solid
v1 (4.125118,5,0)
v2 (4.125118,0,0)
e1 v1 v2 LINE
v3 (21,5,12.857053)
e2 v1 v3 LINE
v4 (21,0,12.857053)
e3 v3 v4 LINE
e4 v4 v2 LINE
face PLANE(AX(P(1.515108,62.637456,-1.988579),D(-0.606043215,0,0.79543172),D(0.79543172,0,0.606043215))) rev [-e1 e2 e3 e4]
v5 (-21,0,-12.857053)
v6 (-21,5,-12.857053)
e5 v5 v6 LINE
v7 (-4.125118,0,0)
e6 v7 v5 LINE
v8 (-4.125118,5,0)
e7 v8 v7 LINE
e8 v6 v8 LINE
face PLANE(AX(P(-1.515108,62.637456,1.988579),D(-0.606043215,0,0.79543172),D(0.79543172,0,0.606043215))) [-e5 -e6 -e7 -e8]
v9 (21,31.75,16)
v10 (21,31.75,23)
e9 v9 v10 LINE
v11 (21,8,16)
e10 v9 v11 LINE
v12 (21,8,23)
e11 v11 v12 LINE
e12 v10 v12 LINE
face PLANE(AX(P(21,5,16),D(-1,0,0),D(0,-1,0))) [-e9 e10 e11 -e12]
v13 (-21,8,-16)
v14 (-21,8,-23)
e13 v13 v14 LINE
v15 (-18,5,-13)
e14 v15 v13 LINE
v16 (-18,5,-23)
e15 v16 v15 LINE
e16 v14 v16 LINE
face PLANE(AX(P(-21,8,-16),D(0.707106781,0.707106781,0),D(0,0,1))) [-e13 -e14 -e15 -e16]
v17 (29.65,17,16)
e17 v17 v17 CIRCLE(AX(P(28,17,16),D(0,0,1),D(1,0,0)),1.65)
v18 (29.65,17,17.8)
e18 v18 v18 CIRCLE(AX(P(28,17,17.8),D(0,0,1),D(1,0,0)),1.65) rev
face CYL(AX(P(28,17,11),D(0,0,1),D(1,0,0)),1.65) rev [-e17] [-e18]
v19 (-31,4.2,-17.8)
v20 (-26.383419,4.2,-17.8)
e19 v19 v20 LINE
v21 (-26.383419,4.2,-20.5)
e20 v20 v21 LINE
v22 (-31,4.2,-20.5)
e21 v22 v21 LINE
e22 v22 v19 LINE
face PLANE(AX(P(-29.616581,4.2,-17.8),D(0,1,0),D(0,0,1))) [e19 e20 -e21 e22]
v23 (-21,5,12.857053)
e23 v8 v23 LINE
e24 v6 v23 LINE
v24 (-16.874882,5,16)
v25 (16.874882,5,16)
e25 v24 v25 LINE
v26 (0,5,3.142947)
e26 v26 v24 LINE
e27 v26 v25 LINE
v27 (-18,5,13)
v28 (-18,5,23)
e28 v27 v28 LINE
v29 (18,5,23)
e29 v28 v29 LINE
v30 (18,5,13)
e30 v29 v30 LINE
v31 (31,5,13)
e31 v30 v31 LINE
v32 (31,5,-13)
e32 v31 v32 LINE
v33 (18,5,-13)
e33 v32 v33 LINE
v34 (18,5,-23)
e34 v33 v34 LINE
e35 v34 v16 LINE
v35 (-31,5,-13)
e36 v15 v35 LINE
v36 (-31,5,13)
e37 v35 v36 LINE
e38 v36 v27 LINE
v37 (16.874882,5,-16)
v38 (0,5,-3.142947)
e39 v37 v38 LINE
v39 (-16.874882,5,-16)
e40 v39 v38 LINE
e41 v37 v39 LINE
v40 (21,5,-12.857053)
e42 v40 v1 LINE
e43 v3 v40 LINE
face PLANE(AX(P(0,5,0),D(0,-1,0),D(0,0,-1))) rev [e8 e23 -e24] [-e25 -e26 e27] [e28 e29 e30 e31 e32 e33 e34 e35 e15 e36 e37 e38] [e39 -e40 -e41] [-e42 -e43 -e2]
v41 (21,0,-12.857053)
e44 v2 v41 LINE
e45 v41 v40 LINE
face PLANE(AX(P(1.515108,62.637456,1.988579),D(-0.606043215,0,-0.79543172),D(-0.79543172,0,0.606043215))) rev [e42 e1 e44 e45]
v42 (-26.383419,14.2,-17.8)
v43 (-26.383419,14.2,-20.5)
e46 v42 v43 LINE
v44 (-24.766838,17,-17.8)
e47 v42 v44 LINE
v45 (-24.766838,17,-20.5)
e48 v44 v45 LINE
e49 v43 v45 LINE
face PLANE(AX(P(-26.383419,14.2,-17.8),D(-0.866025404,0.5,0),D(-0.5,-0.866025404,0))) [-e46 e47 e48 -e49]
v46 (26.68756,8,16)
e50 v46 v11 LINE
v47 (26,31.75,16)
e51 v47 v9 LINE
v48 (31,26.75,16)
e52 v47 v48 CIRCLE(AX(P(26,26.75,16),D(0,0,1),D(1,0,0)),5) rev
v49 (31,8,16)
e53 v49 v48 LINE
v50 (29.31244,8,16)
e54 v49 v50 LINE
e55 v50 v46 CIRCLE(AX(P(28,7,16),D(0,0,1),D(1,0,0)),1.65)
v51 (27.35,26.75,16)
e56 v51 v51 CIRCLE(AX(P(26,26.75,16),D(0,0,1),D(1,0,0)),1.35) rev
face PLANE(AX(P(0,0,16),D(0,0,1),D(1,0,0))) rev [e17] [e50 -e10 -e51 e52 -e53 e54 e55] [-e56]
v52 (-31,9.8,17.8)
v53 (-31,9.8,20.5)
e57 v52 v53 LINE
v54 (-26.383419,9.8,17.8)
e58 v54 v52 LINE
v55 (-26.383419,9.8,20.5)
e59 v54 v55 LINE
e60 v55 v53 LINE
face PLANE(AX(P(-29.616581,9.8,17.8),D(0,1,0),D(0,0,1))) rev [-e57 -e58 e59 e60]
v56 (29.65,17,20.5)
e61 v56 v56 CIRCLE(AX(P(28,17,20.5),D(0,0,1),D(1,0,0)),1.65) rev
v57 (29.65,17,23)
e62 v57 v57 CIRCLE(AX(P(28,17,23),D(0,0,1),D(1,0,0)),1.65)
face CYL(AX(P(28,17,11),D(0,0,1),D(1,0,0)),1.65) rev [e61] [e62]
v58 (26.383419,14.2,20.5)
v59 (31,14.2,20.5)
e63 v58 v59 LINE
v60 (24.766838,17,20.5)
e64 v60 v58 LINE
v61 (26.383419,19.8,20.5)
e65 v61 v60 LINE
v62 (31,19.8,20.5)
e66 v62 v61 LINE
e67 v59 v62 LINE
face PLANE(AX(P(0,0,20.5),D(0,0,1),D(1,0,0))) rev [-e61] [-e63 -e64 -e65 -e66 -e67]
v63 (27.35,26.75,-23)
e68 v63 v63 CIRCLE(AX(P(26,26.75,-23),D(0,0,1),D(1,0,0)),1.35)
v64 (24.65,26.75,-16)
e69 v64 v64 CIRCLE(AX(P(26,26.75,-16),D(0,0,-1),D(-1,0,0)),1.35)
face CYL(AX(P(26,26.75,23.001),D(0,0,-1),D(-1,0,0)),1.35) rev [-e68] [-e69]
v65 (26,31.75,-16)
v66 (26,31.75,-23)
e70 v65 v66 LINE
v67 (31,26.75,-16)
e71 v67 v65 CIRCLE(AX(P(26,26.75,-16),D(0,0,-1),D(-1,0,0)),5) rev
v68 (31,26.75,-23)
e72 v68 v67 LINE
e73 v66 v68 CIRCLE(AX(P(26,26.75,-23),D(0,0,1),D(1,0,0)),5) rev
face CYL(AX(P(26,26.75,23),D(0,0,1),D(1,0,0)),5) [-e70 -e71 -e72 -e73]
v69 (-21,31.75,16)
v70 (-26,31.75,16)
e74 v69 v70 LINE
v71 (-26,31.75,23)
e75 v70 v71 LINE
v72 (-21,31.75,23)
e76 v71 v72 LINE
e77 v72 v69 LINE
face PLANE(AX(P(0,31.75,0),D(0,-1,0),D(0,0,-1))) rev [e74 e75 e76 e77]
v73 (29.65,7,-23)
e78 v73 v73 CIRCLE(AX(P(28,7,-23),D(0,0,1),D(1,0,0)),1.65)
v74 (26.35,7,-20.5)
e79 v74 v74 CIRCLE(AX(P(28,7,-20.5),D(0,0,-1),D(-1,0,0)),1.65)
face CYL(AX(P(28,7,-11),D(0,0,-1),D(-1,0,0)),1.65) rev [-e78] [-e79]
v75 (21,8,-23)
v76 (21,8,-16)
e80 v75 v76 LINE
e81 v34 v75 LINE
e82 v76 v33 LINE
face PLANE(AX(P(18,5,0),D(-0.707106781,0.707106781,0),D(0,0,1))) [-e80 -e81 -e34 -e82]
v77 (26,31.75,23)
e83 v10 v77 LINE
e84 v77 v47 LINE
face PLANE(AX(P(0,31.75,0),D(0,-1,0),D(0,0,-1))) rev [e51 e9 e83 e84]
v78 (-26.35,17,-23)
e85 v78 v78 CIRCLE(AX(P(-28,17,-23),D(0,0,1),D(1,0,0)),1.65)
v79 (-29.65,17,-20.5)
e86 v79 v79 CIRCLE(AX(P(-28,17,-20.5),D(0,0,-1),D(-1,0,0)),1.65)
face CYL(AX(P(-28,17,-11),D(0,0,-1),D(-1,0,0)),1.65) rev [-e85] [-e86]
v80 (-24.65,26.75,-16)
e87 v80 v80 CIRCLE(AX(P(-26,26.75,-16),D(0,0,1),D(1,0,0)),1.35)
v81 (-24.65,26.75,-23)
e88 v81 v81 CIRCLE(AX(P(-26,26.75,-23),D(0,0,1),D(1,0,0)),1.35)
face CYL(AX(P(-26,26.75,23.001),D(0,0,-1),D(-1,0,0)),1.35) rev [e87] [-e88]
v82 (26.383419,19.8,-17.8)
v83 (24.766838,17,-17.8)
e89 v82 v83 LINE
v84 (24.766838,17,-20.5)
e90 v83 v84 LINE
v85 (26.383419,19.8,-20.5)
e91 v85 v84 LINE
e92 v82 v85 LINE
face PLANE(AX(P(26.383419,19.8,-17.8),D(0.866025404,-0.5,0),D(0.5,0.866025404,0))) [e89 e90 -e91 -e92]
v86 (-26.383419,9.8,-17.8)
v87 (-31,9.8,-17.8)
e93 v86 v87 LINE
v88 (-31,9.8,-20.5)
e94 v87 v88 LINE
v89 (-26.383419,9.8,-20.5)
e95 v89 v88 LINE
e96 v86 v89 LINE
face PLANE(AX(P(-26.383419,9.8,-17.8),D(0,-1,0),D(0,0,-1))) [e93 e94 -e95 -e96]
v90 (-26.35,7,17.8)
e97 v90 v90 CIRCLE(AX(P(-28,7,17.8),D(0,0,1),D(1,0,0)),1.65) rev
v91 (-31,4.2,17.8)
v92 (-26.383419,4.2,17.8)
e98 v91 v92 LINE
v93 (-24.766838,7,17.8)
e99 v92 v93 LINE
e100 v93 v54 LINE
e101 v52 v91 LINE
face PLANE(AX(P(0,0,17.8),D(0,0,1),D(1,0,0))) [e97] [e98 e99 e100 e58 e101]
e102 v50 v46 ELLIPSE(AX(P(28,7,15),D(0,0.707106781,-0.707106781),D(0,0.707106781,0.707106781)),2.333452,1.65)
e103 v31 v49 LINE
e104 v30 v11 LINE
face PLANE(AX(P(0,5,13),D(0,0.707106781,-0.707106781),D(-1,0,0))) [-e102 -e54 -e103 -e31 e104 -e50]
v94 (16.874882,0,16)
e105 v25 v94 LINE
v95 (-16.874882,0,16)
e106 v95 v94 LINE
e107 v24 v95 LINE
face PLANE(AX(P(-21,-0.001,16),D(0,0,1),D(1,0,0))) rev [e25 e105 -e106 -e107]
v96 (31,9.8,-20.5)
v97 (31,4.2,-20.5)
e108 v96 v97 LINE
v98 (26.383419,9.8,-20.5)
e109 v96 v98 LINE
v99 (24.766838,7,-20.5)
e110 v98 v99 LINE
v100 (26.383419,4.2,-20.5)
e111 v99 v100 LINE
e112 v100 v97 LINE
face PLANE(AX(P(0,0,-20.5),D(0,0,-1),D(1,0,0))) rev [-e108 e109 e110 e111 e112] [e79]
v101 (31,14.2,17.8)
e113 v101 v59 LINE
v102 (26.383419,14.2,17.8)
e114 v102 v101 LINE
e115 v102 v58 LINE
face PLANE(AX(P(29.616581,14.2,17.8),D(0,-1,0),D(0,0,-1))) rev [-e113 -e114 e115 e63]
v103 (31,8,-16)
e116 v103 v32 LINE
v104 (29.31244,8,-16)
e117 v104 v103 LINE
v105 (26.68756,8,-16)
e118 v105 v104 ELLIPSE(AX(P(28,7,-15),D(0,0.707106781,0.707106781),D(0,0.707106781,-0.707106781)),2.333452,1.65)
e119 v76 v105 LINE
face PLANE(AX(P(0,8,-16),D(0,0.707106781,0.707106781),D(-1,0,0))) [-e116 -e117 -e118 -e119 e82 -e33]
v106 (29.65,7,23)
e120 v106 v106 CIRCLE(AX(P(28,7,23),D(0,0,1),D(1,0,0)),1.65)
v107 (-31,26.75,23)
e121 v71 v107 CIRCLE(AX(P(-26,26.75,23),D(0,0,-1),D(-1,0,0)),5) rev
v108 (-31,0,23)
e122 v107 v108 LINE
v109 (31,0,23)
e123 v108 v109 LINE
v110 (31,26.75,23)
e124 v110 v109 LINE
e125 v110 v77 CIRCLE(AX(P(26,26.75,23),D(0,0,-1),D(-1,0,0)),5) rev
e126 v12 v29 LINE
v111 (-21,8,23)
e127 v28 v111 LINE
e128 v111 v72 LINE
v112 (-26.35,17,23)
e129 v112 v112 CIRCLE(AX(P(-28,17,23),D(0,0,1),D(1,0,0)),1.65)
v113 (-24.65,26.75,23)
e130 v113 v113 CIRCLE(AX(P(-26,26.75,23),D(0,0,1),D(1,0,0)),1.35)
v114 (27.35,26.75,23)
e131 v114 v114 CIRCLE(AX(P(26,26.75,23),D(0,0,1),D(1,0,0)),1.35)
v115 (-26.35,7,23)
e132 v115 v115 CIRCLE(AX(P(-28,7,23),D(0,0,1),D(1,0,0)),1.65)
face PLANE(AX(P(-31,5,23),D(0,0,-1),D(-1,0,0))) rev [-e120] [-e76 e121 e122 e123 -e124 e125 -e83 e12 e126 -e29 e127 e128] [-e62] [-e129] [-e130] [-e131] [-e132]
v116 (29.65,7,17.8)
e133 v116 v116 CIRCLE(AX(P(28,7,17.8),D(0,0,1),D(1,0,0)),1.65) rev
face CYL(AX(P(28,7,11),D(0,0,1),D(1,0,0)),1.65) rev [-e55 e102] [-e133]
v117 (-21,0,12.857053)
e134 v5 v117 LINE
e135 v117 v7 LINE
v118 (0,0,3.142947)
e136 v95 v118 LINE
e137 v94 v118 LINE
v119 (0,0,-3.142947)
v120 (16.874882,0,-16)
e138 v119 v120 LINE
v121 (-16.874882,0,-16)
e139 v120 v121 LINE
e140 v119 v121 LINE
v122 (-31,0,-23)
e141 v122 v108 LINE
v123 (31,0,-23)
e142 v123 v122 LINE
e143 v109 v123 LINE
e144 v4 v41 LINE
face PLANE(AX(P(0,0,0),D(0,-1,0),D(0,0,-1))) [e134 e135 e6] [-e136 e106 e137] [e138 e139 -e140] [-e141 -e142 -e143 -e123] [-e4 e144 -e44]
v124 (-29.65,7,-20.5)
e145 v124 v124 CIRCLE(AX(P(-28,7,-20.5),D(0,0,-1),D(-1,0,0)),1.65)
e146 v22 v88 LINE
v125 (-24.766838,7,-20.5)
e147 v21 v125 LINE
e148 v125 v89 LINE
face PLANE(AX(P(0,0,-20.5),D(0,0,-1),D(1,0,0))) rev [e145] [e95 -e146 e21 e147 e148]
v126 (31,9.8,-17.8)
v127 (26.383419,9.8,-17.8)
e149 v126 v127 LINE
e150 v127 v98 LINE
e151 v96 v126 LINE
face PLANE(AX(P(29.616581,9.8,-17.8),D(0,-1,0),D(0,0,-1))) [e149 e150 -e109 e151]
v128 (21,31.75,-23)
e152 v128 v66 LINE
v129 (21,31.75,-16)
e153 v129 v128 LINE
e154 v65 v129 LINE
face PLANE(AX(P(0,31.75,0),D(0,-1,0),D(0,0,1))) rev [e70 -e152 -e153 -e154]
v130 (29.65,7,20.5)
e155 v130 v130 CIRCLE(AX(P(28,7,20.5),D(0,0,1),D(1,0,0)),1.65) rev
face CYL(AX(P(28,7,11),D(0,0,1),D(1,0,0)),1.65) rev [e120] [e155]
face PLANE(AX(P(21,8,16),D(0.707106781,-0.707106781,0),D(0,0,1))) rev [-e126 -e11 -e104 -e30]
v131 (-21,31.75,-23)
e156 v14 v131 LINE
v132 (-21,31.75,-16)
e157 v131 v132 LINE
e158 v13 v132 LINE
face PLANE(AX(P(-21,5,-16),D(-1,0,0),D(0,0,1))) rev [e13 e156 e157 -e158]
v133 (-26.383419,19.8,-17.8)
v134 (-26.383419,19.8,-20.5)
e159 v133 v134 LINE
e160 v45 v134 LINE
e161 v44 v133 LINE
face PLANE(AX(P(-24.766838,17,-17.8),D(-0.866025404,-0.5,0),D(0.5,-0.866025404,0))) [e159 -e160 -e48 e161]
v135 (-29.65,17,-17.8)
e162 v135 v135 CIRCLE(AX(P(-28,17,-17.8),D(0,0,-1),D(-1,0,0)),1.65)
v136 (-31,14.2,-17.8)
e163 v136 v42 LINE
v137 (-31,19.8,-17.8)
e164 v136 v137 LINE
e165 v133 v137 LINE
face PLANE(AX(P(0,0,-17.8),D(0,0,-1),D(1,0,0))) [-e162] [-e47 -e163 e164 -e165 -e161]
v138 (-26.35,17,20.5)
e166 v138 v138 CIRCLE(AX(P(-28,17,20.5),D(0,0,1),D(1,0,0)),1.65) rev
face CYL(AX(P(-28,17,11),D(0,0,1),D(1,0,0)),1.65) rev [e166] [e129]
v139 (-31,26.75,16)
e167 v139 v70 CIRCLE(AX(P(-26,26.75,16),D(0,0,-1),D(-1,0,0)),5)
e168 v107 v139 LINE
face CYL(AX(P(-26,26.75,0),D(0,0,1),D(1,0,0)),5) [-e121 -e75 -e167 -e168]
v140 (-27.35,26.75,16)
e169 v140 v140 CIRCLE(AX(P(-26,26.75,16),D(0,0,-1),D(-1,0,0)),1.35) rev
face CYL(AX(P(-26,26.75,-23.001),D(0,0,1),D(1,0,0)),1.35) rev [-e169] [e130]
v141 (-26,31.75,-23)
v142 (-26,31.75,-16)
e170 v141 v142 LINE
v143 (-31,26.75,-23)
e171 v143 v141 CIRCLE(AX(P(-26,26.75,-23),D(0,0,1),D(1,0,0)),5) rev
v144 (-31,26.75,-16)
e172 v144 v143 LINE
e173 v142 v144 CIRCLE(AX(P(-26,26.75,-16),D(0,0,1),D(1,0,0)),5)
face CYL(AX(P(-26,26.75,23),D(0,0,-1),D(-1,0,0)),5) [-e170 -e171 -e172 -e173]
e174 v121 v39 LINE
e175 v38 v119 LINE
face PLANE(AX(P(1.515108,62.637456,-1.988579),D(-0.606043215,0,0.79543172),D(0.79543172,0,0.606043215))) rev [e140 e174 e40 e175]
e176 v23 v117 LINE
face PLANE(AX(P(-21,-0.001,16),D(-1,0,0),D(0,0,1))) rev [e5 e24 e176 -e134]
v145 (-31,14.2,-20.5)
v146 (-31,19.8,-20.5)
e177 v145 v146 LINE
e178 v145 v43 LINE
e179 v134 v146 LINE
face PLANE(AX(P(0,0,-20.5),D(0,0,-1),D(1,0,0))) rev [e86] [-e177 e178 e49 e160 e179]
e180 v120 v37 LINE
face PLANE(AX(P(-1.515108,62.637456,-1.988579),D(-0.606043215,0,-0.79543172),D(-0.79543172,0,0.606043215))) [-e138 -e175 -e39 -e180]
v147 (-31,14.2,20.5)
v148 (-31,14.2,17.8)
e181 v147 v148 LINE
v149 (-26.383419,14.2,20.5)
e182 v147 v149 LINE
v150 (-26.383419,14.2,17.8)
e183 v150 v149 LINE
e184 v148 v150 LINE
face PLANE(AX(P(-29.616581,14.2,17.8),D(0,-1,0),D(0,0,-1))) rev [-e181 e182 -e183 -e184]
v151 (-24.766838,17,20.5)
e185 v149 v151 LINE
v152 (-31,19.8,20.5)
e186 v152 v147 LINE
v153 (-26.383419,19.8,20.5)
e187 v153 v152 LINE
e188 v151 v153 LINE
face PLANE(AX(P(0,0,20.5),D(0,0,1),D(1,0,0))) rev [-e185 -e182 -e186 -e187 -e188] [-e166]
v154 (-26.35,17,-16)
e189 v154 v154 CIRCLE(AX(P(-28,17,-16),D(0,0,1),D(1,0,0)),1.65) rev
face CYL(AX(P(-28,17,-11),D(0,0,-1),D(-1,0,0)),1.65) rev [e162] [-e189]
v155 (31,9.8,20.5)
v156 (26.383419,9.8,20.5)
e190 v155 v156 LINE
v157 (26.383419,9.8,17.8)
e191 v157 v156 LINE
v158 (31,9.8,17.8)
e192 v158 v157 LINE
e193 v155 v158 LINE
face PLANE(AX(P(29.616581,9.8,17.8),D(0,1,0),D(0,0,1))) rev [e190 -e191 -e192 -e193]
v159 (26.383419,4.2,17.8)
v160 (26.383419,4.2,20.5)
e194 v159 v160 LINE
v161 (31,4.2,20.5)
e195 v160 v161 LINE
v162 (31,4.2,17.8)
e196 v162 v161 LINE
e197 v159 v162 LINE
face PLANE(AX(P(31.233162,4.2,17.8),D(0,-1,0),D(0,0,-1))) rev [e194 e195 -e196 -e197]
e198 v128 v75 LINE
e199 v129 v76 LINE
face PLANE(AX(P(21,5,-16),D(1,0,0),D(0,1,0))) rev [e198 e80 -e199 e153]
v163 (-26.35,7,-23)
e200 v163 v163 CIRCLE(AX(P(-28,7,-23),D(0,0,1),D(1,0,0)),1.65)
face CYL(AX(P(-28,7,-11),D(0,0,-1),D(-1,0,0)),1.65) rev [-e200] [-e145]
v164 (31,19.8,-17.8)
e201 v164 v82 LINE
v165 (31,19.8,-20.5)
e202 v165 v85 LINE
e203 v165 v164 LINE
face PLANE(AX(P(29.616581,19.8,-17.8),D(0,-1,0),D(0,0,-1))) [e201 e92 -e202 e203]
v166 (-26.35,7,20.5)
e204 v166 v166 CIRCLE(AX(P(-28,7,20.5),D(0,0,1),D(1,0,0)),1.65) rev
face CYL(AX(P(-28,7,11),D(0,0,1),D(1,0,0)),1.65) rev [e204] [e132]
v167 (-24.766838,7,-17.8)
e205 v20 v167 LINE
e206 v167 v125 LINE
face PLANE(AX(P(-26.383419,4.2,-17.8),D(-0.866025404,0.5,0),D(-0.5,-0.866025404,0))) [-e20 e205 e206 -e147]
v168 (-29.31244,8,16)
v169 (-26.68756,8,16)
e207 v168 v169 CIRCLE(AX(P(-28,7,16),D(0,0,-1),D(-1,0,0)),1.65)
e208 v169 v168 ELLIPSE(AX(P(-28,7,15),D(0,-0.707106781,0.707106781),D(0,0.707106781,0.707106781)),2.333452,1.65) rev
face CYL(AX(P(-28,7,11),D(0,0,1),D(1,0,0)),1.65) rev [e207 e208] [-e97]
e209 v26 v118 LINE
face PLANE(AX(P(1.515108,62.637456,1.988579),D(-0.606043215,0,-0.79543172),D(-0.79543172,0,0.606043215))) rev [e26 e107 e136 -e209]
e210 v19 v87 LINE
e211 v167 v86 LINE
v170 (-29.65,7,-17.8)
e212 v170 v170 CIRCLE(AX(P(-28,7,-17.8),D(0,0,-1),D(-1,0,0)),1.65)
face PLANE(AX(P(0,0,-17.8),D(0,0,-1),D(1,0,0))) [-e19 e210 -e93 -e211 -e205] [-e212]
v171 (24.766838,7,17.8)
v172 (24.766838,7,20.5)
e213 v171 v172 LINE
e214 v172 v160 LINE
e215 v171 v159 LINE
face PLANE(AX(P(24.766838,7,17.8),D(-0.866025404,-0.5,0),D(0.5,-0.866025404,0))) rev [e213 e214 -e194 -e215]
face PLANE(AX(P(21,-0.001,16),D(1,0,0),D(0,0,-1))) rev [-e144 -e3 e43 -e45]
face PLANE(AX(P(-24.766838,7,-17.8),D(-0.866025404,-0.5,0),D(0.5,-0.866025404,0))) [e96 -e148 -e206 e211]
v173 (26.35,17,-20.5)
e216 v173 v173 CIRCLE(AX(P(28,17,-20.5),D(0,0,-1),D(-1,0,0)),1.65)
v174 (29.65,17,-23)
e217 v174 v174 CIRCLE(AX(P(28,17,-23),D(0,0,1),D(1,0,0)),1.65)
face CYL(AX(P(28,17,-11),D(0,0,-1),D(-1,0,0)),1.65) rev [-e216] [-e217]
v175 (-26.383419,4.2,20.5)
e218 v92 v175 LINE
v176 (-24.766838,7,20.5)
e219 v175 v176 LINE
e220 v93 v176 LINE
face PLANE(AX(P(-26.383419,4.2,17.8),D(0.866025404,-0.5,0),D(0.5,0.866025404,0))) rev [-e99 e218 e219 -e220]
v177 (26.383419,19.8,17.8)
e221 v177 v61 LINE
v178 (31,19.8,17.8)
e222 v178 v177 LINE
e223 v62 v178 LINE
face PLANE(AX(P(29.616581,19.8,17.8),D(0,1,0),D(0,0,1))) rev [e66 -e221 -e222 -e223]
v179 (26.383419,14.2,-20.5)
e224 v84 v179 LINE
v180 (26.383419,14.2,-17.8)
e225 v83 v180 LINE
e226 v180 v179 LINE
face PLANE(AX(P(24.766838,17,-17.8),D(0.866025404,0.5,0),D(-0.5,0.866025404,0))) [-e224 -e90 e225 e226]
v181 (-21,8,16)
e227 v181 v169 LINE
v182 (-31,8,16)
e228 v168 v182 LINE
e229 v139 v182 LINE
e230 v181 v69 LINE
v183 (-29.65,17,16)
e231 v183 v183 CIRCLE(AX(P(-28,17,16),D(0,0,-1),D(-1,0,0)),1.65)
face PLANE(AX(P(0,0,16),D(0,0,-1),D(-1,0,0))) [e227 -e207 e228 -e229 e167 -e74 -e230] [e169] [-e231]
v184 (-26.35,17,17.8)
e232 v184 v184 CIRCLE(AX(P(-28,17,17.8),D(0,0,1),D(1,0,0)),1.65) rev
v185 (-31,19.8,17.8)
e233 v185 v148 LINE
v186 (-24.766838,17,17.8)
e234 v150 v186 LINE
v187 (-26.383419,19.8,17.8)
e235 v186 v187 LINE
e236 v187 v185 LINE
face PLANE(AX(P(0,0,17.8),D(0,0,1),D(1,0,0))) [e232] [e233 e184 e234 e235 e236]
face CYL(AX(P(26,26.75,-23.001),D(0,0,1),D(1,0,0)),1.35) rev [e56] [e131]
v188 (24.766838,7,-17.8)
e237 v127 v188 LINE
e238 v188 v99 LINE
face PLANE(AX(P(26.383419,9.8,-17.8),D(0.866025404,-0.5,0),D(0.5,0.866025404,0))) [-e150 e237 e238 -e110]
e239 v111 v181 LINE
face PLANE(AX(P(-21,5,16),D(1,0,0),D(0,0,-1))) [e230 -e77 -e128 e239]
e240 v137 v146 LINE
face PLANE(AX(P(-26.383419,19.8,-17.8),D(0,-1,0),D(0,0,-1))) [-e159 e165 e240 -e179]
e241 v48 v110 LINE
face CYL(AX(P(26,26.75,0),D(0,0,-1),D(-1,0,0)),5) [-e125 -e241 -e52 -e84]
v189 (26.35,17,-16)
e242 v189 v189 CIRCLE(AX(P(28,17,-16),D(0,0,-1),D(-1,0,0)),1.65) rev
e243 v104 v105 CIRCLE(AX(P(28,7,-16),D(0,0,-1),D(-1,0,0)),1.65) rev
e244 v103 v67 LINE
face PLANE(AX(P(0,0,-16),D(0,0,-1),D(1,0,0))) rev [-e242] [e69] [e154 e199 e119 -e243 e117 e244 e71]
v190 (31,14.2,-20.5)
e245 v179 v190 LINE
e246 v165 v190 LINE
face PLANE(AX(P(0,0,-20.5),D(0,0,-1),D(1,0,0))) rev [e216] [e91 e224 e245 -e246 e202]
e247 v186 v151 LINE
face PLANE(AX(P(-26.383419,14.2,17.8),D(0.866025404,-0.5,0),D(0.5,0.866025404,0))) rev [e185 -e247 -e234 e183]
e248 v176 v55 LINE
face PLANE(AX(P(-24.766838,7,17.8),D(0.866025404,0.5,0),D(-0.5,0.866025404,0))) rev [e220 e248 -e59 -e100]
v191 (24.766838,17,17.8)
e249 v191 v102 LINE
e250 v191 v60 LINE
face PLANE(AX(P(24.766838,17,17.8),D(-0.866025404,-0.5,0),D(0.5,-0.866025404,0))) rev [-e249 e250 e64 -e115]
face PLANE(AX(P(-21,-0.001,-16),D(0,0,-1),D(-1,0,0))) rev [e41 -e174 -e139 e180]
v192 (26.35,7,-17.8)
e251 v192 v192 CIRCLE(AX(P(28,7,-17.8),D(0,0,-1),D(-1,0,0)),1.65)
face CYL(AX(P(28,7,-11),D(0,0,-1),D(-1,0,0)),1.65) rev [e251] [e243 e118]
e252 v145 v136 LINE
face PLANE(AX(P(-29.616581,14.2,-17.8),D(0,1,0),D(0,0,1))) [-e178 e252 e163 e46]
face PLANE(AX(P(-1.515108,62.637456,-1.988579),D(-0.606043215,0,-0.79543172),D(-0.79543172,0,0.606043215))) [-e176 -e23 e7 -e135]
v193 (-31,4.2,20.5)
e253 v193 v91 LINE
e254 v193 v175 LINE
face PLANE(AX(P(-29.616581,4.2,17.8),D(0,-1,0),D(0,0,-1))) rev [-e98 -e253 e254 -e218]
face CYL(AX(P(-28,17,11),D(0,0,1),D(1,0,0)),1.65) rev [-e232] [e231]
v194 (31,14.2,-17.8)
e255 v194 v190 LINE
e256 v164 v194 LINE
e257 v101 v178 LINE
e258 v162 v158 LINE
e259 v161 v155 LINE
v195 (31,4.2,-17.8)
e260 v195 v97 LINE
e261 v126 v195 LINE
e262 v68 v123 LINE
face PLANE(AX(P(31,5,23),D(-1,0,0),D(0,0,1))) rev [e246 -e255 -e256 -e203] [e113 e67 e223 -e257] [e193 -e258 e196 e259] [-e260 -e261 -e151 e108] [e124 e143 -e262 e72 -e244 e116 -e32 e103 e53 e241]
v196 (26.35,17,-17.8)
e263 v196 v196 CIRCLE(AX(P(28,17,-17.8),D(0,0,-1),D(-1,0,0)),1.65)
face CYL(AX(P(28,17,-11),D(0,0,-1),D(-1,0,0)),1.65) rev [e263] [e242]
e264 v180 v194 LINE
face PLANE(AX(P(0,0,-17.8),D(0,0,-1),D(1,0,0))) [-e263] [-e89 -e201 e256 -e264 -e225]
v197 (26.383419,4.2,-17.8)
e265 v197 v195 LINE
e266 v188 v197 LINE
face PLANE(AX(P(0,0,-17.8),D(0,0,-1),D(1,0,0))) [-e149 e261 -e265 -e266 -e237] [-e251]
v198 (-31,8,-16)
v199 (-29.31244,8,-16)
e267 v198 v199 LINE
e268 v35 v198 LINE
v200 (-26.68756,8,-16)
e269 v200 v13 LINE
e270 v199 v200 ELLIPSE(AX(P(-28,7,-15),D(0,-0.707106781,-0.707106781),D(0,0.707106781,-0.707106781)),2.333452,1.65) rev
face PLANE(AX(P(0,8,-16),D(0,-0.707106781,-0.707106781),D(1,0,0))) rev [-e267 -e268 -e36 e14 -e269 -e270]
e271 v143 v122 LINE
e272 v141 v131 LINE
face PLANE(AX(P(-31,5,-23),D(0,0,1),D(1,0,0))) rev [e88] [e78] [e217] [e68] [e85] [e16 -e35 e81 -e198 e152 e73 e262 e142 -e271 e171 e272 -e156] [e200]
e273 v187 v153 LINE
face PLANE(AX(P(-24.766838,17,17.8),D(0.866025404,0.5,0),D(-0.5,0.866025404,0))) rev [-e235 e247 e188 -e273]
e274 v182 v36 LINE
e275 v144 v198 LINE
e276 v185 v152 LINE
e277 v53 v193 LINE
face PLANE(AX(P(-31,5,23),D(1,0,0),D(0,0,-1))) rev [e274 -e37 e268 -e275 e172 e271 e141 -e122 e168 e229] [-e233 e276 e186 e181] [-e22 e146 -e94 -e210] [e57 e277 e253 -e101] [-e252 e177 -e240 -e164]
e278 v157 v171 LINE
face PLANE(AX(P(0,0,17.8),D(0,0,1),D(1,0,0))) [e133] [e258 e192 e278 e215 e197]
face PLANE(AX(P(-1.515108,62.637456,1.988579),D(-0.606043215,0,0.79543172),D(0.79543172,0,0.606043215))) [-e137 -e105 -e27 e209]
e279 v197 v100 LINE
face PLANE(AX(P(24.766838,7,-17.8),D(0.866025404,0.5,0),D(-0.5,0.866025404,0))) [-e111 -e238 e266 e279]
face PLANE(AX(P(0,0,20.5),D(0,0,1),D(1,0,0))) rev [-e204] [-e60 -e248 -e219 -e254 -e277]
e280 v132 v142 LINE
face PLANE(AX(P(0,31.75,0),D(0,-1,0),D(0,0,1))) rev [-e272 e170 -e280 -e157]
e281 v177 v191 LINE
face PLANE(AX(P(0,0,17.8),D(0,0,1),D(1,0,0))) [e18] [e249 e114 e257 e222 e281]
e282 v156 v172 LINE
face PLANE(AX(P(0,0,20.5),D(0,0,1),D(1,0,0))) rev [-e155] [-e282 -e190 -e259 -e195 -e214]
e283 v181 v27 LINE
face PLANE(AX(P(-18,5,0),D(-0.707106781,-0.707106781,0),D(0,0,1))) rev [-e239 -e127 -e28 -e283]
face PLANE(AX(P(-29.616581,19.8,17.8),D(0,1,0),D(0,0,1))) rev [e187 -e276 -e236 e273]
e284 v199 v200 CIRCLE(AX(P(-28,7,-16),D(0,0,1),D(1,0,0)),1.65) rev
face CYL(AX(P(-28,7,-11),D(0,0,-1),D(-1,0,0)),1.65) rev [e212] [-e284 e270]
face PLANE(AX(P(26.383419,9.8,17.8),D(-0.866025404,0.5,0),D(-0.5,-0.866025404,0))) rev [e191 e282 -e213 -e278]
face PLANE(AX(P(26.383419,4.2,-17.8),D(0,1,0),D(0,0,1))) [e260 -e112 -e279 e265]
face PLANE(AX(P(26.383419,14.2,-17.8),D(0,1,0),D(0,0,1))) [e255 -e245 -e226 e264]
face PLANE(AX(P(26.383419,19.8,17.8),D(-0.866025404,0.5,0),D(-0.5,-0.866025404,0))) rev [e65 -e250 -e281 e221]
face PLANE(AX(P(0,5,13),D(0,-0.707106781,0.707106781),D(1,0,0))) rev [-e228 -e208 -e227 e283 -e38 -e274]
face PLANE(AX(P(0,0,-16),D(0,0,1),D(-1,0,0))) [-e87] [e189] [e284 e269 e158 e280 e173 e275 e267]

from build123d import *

# Parameters (mm, degrees)
SKETCH_1_W          = 62
SKETCH_1_H          = 46
EXTRUDE_1_DEPTH     = 5
SKETCH_2_W          = 10
SKETCH_2_H          = 17
EXTRUDE_2_DEPTH     = 7
SKETCH_3_R          = 1.65
CUT_EXTRUDE_1_DEPTH = 12
SKETCH_7_W          = 10
SKETCH_7_H          = 7
EXTRUDE_4_DEPTH     = 9.75
CUT_EXTRUDE_4_REACH = 65.914
SKETCH_8_R          = 1.35
CUT_EXTRUDE_2_DEPTH = 2.7
CUT_EXTRUDE_3_REACH = 51.981
SKETCH_5_W          = 42
SKETCH_5_H          = 32
EXTRUDE_3_DEPTH     = 5
CHAMFER_4_SIZE      = 3
FILLET_1_R          = 5


with BuildPart() as part:
    # 草图1 → 凸台-拉伸1 (new body)
    with BuildSketch(Plane(origin=(0, 0, 0), x_dir=(1, 0, 0), z_dir=(0, 1, 0))):
        Rectangle(SKETCH_1_W, SKETCH_1_H)
    extrude(amount=EXTRUDE_1_DEPTH)

    # 草图2 → 凸台-拉伸2 (add)
    with BuildSketch(Plane.XY.offset(23)):
        with Locations((-26, 13.5)):
            Rectangle(SKETCH_2_W, SKETCH_2_H)
        with Locations((26, 13.5)):
            Rectangle(SKETCH_2_W, SKETCH_2_H)
    extrude_2 = extrude(amount=-EXTRUDE_2_DEPTH)

    # 草图3 → 切除-拉伸1 (cut)
    with BuildSketch(Plane.XY.offset(23)):
        with Locations((-28, 17)):
            Circle(SKETCH_3_R)
        with Locations((-28, 7)):
            Circle(SKETCH_3_R)
        with Locations((28, 7)):
            Circle(SKETCH_3_R)
        with Locations((28, 17)):
            Circle(SKETCH_3_R)
    cut_extrude_1 = extrude(amount=-CUT_EXTRUDE_1_DEPTH, mode=Mode.SUBTRACT)

    # 草图7 → 凸台-拉伸4 (add)
    with BuildSketch(Plane(origin=(0, 22, 0), x_dir=(1, 0, 0), z_dir=(0, 1, 0))):
        with Locations((-26, -19.5)):
            Rectangle(SKETCH_7_W, SKETCH_7_H)
        with Locations((26, -19.5)):
            Rectangle(SKETCH_7_W, SKETCH_7_H)
    extrude_4 = extrude(amount=EXTRUDE_4_DEPTH)

    # 草图8 → 切除-拉伸4 (cut, up to next)
    with BuildSketch(Plane.XY.offset(23), mode=Mode.PRIVATE) as cut_extrude_4_sk1:
        with Locations((-26, 26.75)):
            Circle(SKETCH_8_R)
    cut_extrude_4_tool1 = extrude(cut_extrude_4_sk1.sketch, amount=-CUT_EXTRUDE_4_REACH, mode=Mode.PRIVATE) & part.part
    # 草图8 → 切除-拉伸4 (cut, up to next)
    with BuildSketch(Plane.XY.offset(23), mode=Mode.PRIVATE) as cut_extrude_4_sk2:
        with Locations((26, 26.75)):
            Circle(SKETCH_8_R)
    cut_extrude_4_tool2 = extrude(cut_extrude_4_sk2.sketch, amount=-CUT_EXTRUDE_4_REACH, mode=Mode.PRIVATE) & part.part
    cut_extrude_4_1 = cut_extrude_4_tool1.solids().sort_by_distance((-26, 26.75, 23))[0]
    add(cut_extrude_4_1, mode=Mode.SUBTRACT)
    cut_extrude_4_2 = cut_extrude_4_tool2.solids().sort_by_distance((26, 26.75, 23))[0]
    add(cut_extrude_4_2, mode=Mode.SUBTRACT)
    cut_extrude_4 = cut_extrude_4_1 + cut_extrude_4_2  # 切除-拉伸4 as one shape, for the pattern or mirror that repeats it

    # 草图4 → 切除-拉伸2 (cut)
    with BuildSketch(Plane.XY.offset(20.5)):
        Polygon((-29.616580754, 19.8), (-31.233161507, 19.8), (-31.233161507, 17), (-31.233161507, 14.2), (-29.616580754, 14.2), (-26.383419246, 14.2), (-24.766838493, 17), (-26.383419246, 19.8), align=None)
        Polygon((-24.766838493, 7), (-26.383419246, 9.8), (-29.616580754, 9.8), (-31.233161507, 9.8), (-31.233161507, 7), (-31.233161507, 4.2), (-29.616580754, 4.2), (-26.383419246, 4.2), align=None)
        Polygon((24.766838493, 17), (26.383419246, 14.2), (29.616580754, 14.2), (31.233161507, 14.2), (31.233161507, 17), (31.233161507, 19.8), (29.616580754, 19.8), (26.383419246, 19.8), align=None)
        Polygon((24.766838493, 7), (26.383419246, 4.2), (29.616580754, 4.2), (31.233161507, 4.2), (31.233161507, 7), (31.233161507, 9.8), (29.616580754, 9.8), (26.383419246, 9.8), align=None)
    cut_extrude_2 = extrude(amount=-CUT_EXTRUDE_2_DEPTH, mode=Mode.SUBTRACT)

    # 镜向1: 凸台-拉伸2, 切除-拉伸1, 凸台-拉伸4, 切除-拉伸4, 切除-拉伸2 across plane
    add(extrude_2.mirror(Plane.XY))
    add(cut_extrude_1.mirror(Plane.XY), mode=Mode.SUBTRACT)
    add(extrude_4.mirror(Plane.XY))
    add(cut_extrude_4.mirror(Plane.XY), mode=Mode.SUBTRACT)
    add(cut_extrude_2.mirror(Plane.XY), mode=Mode.SUBTRACT)

    # 草图5 → 切除-拉伸3 (cut, up to next)
    with BuildSketch(Plane(origin=(0, 31.75, 0), x_dir=(1, 0, 0), z_dir=(0, 1, 0)), mode=Mode.PRIVATE) as cut_extrude_3_sk1:
        Rectangle(SKETCH_5_W, SKETCH_5_H)
    cut_extrude_3_tool1 = extrude(cut_extrude_3_sk1.sketch, amount=-CUT_EXTRUDE_3_REACH, mode=Mode.PRIVATE) & part.part
    add(cut_extrude_3_tool1.solids().sort_by_distance((0, 31.75, 0))[0], mode=Mode.SUBTRACT)

    # 草图6 → 凸台-拉伸3 (add)
    with BuildSketch(Plane(origin=(0, 0, 0), x_dir=(1, 0, 0), z_dir=(0, 1, 0))):
        Polygon((-22.515108038, 14.0114207), (-4.12511837, 0), (0, 3.142947329), (-19.484891962, 17.9885793), align=None)
        Polygon((0, 3.142947329), (4.12511837, 0), (22.515108038, 14.0114207), (19.484891962, 17.9885793), align=None)
        Polygon((-4.12511837, 0), (0, -3.142947329), (4.12511837, 0), (0, 3.142947329), align=None)
        Polygon((-19.484891962, -17.9885793), (0, -3.142947329), (-4.12511837, 0), (-22.515108038, -14.0114207), align=None)
        Polygon((0, -3.142947329), (19.484891962, -17.9885793), (22.515108038, -14.0114207), (4.12511837, 0), align=None)
    extrude(amount=EXTRUDE_3_DEPTH)

    # 倒角4
    # the kernel refuses this chamfer: 3 mm, written as the material it adds along each edge
    with BuildSketch(Plane(origin=(-31, 5, 16), x_dir=(0, -0.027495876610586494, -0.9996219169112968), z_dir=(1, 0, 0))) as chamfer_4_piece_1_section:
        Polygon((CHAMFER_4_SIZE * 0.999621916911, CHAMFER_4_SIZE * 0.0274958766106), (-CHAMFER_4_SIZE * 0.0274958766106, CHAMFER_4_SIZE * 0.999621916911), (0, 0), align=None)
    chamfer_4_piece_1 = extrude(amount=10, mode=Mode.PRIVATE)
    chamfer_4_piece_1 = chamfer_4_piece_1 - Plane(origin=(-28, 7, 14.954388988), x_dir=(1, 0, 0), z_dir=(0, 0, 1)) * Cylinder(1.65, 32, mode=Mode.PRIVATE)
    add(chamfer_4_piece_1)
    with BuildSketch(Plane(origin=(-21, 5, 23), x_dir=(-0.02749587661058678, 0.9996219169112968, 0), z_dir=(0, 0, -1)), Plane(origin=(-21, 5, -23), x_dir=(0.9996219169112968, -0.02749587661058648, 0), z_dir=(0, 0, 1)), Plane(origin=(21, 5, 23), x_dir=(-0.9996219169112968, -0.02749587661058619, 0), z_dir=(0, 0, -1))) as chamfer_4_piece_2:
        Polygon((CHAMFER_4_SIZE * 0.999621916911, CHAMFER_4_SIZE * 0.0274958766106), (-CHAMFER_4_SIZE * 0.0274958766106, CHAMFER_4_SIZE * 0.999621916911), (0, 0), align=None)
    extrude(amount=7)
    with BuildSketch(Plane(origin=(-31, 5, -16), x_dir=(0, -0.027495876610586494, 0.9996219169112968), z_dir=(1, 0, 0))) as chamfer_4_piece_3_section:
        Polygon((CHAMFER_4_SIZE * 0.999621916911, -CHAMFER_4_SIZE * 0.0274958766106), (-CHAMFER_4_SIZE * 0.0274958766106, -CHAMFER_4_SIZE * 0.999621916911), (0, 0), align=None)
    chamfer_4_piece_3 = extrude(amount=10, mode=Mode.PRIVATE)
    chamfer_4_piece_3 = chamfer_4_piece_3 - Plane(origin=(-28, 7, -14.954388988), x_dir=(1, 0, 0), z_dir=(0, 0, -1)) * Cylinder(1.65, 32, mode=Mode.PRIVATE)
    add(chamfer_4_piece_3)
    with BuildSketch(Plane(origin=(21, 5, -23), x_dir=(-0.9996219169112968, -0.02749587661058619, 0), z_dir=(0, 0, 1))) as chamfer_4_piece_4:
        Polygon((CHAMFER_4_SIZE * 0.999621916911, -CHAMFER_4_SIZE * 0.0274958766106), (-CHAMFER_4_SIZE * 0.0274958766106, -CHAMFER_4_SIZE * 0.999621916911), (0, 0), align=None)
    extrude(amount=7)
    with BuildSketch(Plane(origin=(31, 5, -16), x_dir=(0, -0.027495876610586494, 0.9996219169112968), z_dir=(-1, 0, 0))) as chamfer_4_piece_5_section:
        Polygon((CHAMFER_4_SIZE * 0.999621916911, CHAMFER_4_SIZE * 0.0274958766106), (-CHAMFER_4_SIZE * 0.0274958766106, CHAMFER_4_SIZE * 0.999621916911), (0, 0), align=None)
    chamfer_4_piece_5 = extrude(amount=10, mode=Mode.PRIVATE)
    chamfer_4_piece_5 = chamfer_4_piece_5 - Plane(origin=(28, 7, -14.954389008), x_dir=(1, 0, 0), z_dir=(0, 0, -1)) * Cylinder(1.65, 32, mode=Mode.PRIVATE)
    add(chamfer_4_piece_5)
    with BuildSketch(Plane(origin=(31, 5, 16), x_dir=(0, -0.027495876610586494, -0.9996219169112968), z_dir=(-1, 0, 0))) as chamfer_4_piece_6_section:
        Polygon((CHAMFER_4_SIZE * 0.999621916911, -CHAMFER_4_SIZE * 0.0274958766106), (-CHAMFER_4_SIZE * 0.0274958766106, -CHAMFER_4_SIZE * 0.999621916911), (0, 0), align=None)
    chamfer_4_piece_6 = extrude(amount=10, mode=Mode.PRIVATE)
    chamfer_4_piece_6 = chamfer_4_piece_6 - Plane(origin=(28, 7, 14.954389008), x_dir=(1, 0, 0), z_dir=(0, 0, 1)) * Cylinder(1.65, 32, mode=Mode.PRIVATE)
    add(chamfer_4_piece_6)
    with BuildSketch(Plane(origin=(-21, 5, 23), x_dir=(-0.02749587661058678, 0.9996219169112968, 0), z_dir=(0, 0, -1))) as chamfer_4_piece_7a_section:
        Polygon((CHAMFER_4_SIZE * 0.999621916911, CHAMFER_4_SIZE * 0.0274958766106), (-CHAMFER_4_SIZE * 0.0274958766106, CHAMFER_4_SIZE * 0.999621916911), (0, 0), align=None)
    chamfer_4_piece_7a = extrude(amount=14.715048964, mode=Mode.PRIVATE)
    chamfer_4_piece_7a = split(chamfer_4_piece_7a, bisect_by=Plane(origin=(-19.8988735, 5.929641192, 16), z_dir=(0, 0, -1)), keep=Keep.TOP, mode=Mode.PRIVATE)
    chamfer_4_piece_7a = split(chamfer_4_piece_7a, bisect_by=Plane(origin=(-20.858643002, 5.929641192, 12.749352101), z_dir=(0.6060432152628566, 0, 0.7954317200324984)), keep=Keep.TOP, mode=Mode.PRIVATE)
    with BuildSketch(Plane(origin=(-31, 5, 16), x_dir=(0, -0.027495876610586494, -0.9996219169112968), z_dir=(1, 0, 0))) as chamfer_4_piece_7b_section:
        Polygon((CHAMFER_4_SIZE * 0.999621916911, CHAMFER_4_SIZE * 0.0274958766106), (-CHAMFER_4_SIZE * 0.0274958766106, CHAMFER_4_SIZE * 0.999621916911), (0, 0), align=None)
    chamfer_4_piece_7b = extrude(amount=17.715048964, mode=Mode.PRIVATE)
    chamfer_4_piece_7b = split(chamfer_4_piece_7b, bisect_by=Plane(origin=(-21, 5.915915897, 14.873215442), z_dir=(1, 0, 0)), keep=Keep.TOP, mode=Mode.PRIVATE)
    chamfer_4_piece_7b = split(chamfer_4_piece_7b, bisect_by=Plane(origin=(-17.170062576, 5.915915897, 16.224899768), z_dir=(-0.6060432152628568, 0, -0.7954317200324983)), keep=Keep.TOP, mode=Mode.PRIVATE)
    chamfer_4_piece_7 = chamfer_4_piece_7a & chamfer_4_piece_7b
    add(chamfer_4_piece_7)
    with BuildSketch(Plane(origin=(-21, 5, -23), x_dir=(0.9996219169112968, -0.02749587661058648, 0), z_dir=(0, 0, 1))) as chamfer_4_piece_8a_section:
        Polygon((CHAMFER_4_SIZE * 0.999621916911, CHAMFER_4_SIZE * 0.0274958766106), (-CHAMFER_4_SIZE * 0.0274958766106, CHAMFER_4_SIZE * 0.999621916911), (0, 0), align=None)
    chamfer_4_piece_8a = extrude(amount=14.715048964, mode=Mode.PRIVATE)
    chamfer_4_piece_8a = split(chamfer_4_piece_8a, bisect_by=Plane(origin=(-20.858643002, 5.929641192, -12.749352101), z_dir=(0.6060432152628563, 0, -0.7954317200324986)), keep=Keep.TOP, mode=Mode.PRIVATE)
    chamfer_4_piece_8a = split(chamfer_4_piece_8a, bisect_by=Plane(origin=(-19.8988735, 5.929641192, -16), z_dir=(0, 0, 1)), keep=Keep.TOP, mode=Mode.PRIVATE)
    with BuildSketch(Plane(origin=(-31, 5, -16), x_dir=(0, -0.027495876610586494, 0.9996219169112968), z_dir=(1, 0, 0))) as chamfer_4_piece_8b_section:
        Polygon((CHAMFER_4_SIZE * 0.999621916911, -CHAMFER_4_SIZE * 0.0274958766106), (-CHAMFER_4_SIZE * 0.0274958766106, -CHAMFER_4_SIZE * 0.999621916911), (0, 0), align=None)
    chamfer_4_piece_8b = extrude(amount=17.715048964, mode=Mode.PRIVATE)
    chamfer_4_piece_8b = split(chamfer_4_piece_8b, bisect_by=Plane(origin=(-17.170062576, 5.915915897, -16.224899768), z_dir=(-0.6060432152628565, 0, 0.7954317200324984)), keep=Keep.TOP, mode=Mode.PRIVATE)
    chamfer_4_piece_8b = split(chamfer_4_piece_8b, bisect_by=Plane(origin=(-21, 5.915915897, -14.873215442), z_dir=(1, 0, 0)), keep=Keep.TOP, mode=Mode.PRIVATE)
    chamfer_4_piece_8 = chamfer_4_piece_8a & chamfer_4_piece_8b
    add(chamfer_4_piece_8)
    with BuildSketch(Plane(origin=(31, 5, -16), x_dir=(0, -0.027495876610586494, 0.9996219169112968), z_dir=(-1, 0, 0))) as chamfer_4_piece_9a_section:
        Polygon((CHAMFER_4_SIZE * 0.999621916911, CHAMFER_4_SIZE * 0.0274958766106), (-CHAMFER_4_SIZE * 0.0274958766106, CHAMFER_4_SIZE * 0.999621916911), (0, 0), align=None)
    chamfer_4_piece_9a = extrude(amount=17.715048964, mode=Mode.PRIVATE)
    chamfer_4_piece_9a = split(chamfer_4_piece_9a, bisect_by=Plane(origin=(17.170062576, 5.915915897, -16.224899768), z_dir=(0.6060432152628568, 0, 0.7954317200324984)), keep=Keep.TOP, mode=Mode.PRIVATE)
    chamfer_4_piece_9a = split(chamfer_4_piece_9a, bisect_by=Plane(origin=(21, 5.915915897, -14.873215442), z_dir=(-1, 0, 0)), keep=Keep.TOP, mode=Mode.PRIVATE)
    with BuildSketch(Plane(origin=(21, 5, -23), x_dir=(-0.9996219169112968, -0.02749587661058619, 0), z_dir=(0, 0, 1))) as chamfer_4_piece_9b_section:
        Polygon((CHAMFER_4_SIZE * 0.999621916911, -CHAMFER_4_SIZE * 0.0274958766106), (-CHAMFER_4_SIZE * 0.0274958766106, -CHAMFER_4_SIZE * 0.999621916911), (0, 0), align=None)
    chamfer_4_piece_9b = extrude(amount=14.715048964, mode=Mode.PRIVATE)
    chamfer_4_piece_9b = split(chamfer_4_piece_9b, bisect_by=Plane(origin=(20.858643002, 5.929641192, -12.749352101), z_dir=(-0.6060432152628568, 0, -0.7954317200324983)), keep=Keep.TOP, mode=Mode.PRIVATE)
    chamfer_4_piece_9b = split(chamfer_4_piece_9b, bisect_by=Plane(origin=(19.8988735, 5.929641192, -16), z_dir=(0, 0, 1)), keep=Keep.TOP, mode=Mode.PRIVATE)
    chamfer_4_piece_9 = chamfer_4_piece_9a & chamfer_4_piece_9b
    add(chamfer_4_piece_9)
    with BuildSketch(Plane(origin=(21, 5, 23), x_dir=(-0.9996219169112968, -0.02749587661058619, 0), z_dir=(0, 0, -1))) as chamfer_4_piece_10a_section:
        Polygon((CHAMFER_4_SIZE * 0.999621916911, CHAMFER_4_SIZE * 0.0274958766106), (-CHAMFER_4_SIZE * 0.0274958766106, CHAMFER_4_SIZE * 0.999621916911), (0, 0), align=None)
    chamfer_4_piece_10a = extrude(amount=14.715048964, mode=Mode.PRIVATE)
    chamfer_4_piece_10a = split(chamfer_4_piece_10a, bisect_by=Plane(origin=(20.858643002, 5.929641192, 12.749352101), z_dir=(-0.6060432152628565, 0, 0.7954317200324984)), keep=Keep.TOP, mode=Mode.PRIVATE)
    chamfer_4_piece_10a = split(chamfer_4_piece_10a, bisect_by=Plane(origin=(19.8988735, 5.929641192, 16), z_dir=(0, 0, -1)), keep=Keep.TOP, mode=Mode.PRIVATE)
    with BuildSketch(Plane(origin=(31, 5, 16), x_dir=(0, -0.027495876610586494, -0.9996219169112968), z_dir=(-1, 0, 0))) as chamfer_4_piece_10b_section:
        Polygon((CHAMFER_4_SIZE * 0.999621916911, -CHAMFER_4_SIZE * 0.0274958766106), (-CHAMFER_4_SIZE * 0.0274958766106, -CHAMFER_4_SIZE * 0.999621916911), (0, 0), align=None)
    chamfer_4_piece_10b = extrude(amount=17.715048964, mode=Mode.PRIVATE)
    chamfer_4_piece_10b = split(chamfer_4_piece_10b, bisect_by=Plane(origin=(17.170062576, 5.915915897, 16.224899768), z_dir=(0.6060432152628563, 0, -0.7954317200324986)), keep=Keep.TOP, mode=Mode.PRIVATE)
    chamfer_4_piece_10b = split(chamfer_4_piece_10b, bisect_by=Plane(origin=(21, 5.915915897, 14.873215442), z_dir=(-1, 0, 0)), keep=Keep.TOP, mode=Mode.PRIVATE)
    chamfer_4_piece_10 = chamfer_4_piece_10a & chamfer_4_piece_10b
    add(chamfer_4_piece_10)

    # 圆角1
    fillet_1_edges = [part.edges().sort_by_distance(p)[0] for p in [
        (-31, 31.75, -19.5),
        (31, 31.75, -19.5),
        (-31, 31.75, 19.5),
        (31, 31.75, 19.5),
    ]]
    fillet(fillet_1_edges, radius=FILLET_1_R)


solid = part.part
